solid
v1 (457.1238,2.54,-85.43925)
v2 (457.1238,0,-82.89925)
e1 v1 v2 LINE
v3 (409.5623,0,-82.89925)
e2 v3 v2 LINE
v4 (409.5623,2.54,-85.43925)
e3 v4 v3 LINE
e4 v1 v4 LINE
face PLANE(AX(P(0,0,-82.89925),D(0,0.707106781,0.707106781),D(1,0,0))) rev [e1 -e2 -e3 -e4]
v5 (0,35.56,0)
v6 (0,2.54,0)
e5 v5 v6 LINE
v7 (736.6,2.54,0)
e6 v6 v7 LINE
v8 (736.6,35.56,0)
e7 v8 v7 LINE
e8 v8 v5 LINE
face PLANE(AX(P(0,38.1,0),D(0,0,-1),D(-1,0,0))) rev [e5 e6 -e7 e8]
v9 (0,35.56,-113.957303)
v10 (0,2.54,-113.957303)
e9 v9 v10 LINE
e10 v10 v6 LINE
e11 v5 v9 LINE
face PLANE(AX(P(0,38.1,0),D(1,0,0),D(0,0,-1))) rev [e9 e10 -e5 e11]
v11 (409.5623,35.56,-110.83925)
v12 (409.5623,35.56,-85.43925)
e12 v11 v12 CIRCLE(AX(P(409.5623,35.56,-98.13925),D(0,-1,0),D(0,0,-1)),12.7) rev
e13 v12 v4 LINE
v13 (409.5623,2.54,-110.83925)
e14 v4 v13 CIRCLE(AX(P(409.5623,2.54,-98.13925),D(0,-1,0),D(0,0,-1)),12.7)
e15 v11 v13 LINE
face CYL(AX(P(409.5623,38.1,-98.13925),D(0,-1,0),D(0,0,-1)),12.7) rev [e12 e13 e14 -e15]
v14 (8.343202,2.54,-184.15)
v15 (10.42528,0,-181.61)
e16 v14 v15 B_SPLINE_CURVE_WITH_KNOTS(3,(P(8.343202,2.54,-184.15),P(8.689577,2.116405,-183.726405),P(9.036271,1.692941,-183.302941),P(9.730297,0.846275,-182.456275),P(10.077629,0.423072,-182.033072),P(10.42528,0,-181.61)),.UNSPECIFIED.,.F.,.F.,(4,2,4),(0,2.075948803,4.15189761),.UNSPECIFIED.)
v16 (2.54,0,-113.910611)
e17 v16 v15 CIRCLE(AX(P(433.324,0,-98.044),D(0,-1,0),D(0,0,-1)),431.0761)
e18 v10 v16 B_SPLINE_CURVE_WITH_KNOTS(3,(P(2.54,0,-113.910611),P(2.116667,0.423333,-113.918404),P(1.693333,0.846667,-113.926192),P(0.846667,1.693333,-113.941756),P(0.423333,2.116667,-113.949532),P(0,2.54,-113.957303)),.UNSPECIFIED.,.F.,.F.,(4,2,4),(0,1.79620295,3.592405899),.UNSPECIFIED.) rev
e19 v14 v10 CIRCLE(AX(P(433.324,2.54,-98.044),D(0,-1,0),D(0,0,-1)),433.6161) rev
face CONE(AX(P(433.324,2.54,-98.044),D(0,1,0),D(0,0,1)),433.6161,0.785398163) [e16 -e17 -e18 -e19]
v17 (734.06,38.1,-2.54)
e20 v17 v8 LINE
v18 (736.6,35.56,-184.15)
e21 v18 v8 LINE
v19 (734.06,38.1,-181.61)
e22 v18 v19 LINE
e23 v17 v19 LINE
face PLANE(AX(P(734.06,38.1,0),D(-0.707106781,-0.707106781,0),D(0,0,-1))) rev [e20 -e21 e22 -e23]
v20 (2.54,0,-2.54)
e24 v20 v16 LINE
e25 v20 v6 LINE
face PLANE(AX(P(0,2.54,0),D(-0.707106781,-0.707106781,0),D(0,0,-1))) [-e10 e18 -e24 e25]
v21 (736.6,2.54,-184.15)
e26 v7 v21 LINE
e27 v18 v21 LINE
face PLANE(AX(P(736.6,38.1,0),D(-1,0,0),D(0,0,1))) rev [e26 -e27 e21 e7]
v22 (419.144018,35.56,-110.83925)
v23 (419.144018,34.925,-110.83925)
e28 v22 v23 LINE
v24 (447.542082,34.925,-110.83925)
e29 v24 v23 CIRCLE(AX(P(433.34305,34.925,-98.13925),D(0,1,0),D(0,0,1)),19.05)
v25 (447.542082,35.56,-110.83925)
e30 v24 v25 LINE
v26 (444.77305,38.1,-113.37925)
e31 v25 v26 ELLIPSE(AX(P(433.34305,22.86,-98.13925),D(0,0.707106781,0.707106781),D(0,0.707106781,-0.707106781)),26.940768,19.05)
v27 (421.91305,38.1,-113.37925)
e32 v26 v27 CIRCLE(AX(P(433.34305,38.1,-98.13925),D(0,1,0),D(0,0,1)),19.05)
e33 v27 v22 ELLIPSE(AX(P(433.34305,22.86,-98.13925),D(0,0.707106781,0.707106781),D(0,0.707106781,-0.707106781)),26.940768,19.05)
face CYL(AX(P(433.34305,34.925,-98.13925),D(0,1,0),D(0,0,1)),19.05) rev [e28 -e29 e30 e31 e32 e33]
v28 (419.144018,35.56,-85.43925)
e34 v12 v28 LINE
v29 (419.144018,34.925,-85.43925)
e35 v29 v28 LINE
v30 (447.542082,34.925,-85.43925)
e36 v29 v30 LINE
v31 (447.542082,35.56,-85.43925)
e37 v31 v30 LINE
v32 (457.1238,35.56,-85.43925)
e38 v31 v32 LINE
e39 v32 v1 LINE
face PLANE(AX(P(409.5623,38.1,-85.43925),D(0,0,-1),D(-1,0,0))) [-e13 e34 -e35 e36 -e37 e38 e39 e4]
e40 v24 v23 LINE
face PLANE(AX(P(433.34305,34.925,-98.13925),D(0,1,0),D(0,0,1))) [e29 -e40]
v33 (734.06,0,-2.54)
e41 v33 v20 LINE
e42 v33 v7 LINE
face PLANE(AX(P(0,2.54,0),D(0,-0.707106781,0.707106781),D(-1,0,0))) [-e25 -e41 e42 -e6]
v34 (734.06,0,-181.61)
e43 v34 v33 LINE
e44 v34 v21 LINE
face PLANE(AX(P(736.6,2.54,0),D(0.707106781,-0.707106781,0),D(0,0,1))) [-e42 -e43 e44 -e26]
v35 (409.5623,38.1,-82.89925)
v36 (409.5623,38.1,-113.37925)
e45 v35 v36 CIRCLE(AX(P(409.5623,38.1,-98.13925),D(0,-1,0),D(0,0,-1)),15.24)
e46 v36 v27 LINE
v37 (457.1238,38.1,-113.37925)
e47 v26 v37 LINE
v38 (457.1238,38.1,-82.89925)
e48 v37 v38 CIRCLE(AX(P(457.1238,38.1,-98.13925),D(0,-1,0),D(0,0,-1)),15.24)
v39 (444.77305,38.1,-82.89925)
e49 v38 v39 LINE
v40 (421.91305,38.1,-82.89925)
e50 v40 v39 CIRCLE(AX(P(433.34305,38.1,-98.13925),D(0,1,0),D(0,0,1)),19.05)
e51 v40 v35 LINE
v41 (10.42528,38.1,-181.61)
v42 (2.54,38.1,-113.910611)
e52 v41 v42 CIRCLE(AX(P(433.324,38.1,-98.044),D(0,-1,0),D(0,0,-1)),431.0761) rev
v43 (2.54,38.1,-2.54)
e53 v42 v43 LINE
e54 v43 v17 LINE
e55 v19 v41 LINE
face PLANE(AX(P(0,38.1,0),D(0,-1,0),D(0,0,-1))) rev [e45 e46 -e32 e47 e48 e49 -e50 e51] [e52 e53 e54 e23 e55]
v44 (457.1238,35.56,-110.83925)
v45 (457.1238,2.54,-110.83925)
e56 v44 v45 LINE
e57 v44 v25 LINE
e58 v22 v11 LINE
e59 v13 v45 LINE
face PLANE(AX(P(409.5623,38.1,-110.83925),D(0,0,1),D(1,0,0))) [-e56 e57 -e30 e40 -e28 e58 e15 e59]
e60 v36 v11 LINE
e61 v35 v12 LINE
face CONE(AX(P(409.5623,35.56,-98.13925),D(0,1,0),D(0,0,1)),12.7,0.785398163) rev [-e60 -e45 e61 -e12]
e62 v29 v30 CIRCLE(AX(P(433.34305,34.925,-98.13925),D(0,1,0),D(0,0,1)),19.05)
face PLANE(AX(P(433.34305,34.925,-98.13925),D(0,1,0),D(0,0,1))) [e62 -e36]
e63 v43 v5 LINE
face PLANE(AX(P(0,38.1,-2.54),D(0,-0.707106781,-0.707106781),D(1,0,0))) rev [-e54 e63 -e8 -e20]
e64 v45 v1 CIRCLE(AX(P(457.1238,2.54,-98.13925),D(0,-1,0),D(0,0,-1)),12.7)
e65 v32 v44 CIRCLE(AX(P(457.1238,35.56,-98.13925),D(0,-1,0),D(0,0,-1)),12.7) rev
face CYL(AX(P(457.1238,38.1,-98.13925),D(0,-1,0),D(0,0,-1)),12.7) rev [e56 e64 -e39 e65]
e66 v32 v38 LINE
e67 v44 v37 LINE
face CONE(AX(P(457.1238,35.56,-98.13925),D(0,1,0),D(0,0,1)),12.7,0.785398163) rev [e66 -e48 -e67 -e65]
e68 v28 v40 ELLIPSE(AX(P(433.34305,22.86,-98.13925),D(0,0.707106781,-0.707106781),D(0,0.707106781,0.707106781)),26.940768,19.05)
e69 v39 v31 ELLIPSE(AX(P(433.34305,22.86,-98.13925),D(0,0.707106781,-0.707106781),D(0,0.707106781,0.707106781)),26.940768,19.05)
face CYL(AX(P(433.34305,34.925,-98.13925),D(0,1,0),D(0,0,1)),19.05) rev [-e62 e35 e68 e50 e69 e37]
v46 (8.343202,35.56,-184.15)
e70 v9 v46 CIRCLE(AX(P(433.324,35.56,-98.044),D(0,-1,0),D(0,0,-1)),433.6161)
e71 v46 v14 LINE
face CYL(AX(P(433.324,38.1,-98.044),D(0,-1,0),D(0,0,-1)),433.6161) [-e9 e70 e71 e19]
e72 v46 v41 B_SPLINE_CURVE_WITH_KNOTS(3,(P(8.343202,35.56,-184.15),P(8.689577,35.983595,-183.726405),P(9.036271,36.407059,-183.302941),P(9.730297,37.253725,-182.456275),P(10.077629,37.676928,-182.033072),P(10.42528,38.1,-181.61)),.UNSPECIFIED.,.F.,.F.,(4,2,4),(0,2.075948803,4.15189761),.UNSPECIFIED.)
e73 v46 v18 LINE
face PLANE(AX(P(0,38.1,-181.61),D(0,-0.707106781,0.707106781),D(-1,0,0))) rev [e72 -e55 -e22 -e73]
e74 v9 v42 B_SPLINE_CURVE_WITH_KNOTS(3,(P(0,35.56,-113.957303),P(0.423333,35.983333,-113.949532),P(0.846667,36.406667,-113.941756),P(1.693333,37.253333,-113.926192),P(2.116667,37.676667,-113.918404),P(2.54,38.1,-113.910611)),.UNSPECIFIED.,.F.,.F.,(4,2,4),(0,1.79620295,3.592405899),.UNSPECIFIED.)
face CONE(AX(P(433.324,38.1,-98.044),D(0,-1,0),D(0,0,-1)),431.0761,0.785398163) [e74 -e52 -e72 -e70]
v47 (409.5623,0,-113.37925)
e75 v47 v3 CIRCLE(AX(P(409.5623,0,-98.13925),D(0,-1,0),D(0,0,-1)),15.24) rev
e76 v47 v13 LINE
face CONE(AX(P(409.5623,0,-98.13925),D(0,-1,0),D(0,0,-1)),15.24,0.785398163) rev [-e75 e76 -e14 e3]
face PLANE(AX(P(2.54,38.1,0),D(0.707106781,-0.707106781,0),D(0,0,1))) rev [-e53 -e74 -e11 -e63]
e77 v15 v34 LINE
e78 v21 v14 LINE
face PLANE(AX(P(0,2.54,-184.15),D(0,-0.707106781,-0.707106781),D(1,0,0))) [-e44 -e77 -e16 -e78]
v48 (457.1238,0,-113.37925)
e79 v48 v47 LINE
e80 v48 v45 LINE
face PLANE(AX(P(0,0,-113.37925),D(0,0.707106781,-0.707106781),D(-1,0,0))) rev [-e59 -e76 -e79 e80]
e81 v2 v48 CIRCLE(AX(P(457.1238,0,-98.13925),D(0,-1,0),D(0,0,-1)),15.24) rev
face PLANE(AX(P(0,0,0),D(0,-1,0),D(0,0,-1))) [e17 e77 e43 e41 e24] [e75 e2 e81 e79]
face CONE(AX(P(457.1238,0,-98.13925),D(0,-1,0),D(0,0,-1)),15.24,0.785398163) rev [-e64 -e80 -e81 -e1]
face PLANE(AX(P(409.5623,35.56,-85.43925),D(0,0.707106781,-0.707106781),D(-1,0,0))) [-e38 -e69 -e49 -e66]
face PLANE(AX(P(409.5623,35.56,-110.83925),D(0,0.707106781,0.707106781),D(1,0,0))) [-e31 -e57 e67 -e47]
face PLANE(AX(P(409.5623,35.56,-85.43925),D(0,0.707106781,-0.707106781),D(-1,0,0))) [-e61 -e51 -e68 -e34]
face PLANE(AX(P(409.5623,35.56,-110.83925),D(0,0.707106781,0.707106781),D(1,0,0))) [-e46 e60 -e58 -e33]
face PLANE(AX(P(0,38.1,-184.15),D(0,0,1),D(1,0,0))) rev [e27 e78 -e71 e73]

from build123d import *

# Parameters (mm, degrees)
SKETCH1_W           = 736.6
SKETCH1_H           = 184.15
BOSS_EXTRUDE1_DEPTH = 38.1
CUT_EXTRUDE2_DEPTH  = 761.225224851
CHAMFER1_SIZE       = 2.54
CHAMFER2_SIZE       = 2.54
SKETCH2_R           = 19.05
CUT_EXTRUDE1_DEPTH  = 3.175


with BuildPart() as part:
    # Sketch1 → Boss-Extrude1 (new body)
    with BuildSketch(Plane(origin=(0, 0, 0), x_dir=(1, 0, 0), z_dir=(0, 1, 0))):
        with Locations((368.3, 92.075)):
            Rectangle(SKETCH1_W, SKETCH1_H)
        with BuildLine():
            Line((409.5623, 110.83925), (457.1238, 110.83925))
            ThreePointArc((457.1238, 110.83925), (469.8238, 98.13925), (457.1238, 85.43925))
            Line((457.1238, 85.43925), (409.5623, 85.43925))
            ThreePointArc((409.5623, 85.43925), (396.8623, 98.13925), (409.5623, 110.83925))
        make_face(mode=Mode.SUBTRACT)
    extrude(amount=BOSS_EXTRUDE1_DEPTH)

    # Sketch4 → Cut-Extrude2 (cut, through all)
    with BuildSketch(Plane.XZ):
        with BuildLine():
            Line((0, -184.15), (0, -113.957302712))
            ThreePointArc((0, -113.957302712), (2.738891811, -149.223945145), (8.343201677, -184.15))
            Line((8.343201677, -184.15), (0, -184.15))
        make_face()
    extrude(amount=-CUT_EXTRUDE2_DEPTH, mode=Mode.SUBTRACT)

    # Chamfer1
    # the kernel refuses this chamfer: 2.54 mm, written as the material it takes off along each edge
    with BuildSketch(Plane(origin=(736.6, 38.1, 6.532074789), x_dir=(0.027495876610568244, -0.9996219169112971, 0), z_dir=(0, 0, -1))) as chamfer1_piece_1:
        Polygon((CHAMFER1_SIZE * 0.999621916911, CHAMFER1_SIZE * 0.0274958766106), (-CHAMFER1_SIZE * 0.0274958766106, CHAMFER1_SIZE * 0.999621916911), (0, 0), align=None)
    extrude(amount=197.214149579, mode=Mode.SUBTRACT)
    with BuildSketch(Plane(origin=(457.1238, 38.1, -98.13925), x_dir=(0, 0, -1), z_dir=(-1, 0, 0))) as chamfer1_piece_2:
        Polygon((12.7 + CHAMFER1_SIZE, 0), (12.7, CHAMFER1_SIZE), (12.7, 0), align=None)
    revolve(axis=Axis((457.1238, 38.1, -98.13925), (0, -1, 0)), revolution_arc=180, mode=Mode.SUBTRACT)
    with BuildSketch(Plane(origin=(743.132074789, 38.1, -184.15), x_dir=(0, 0.027495876610587267, 0.9996219169112966), z_dir=(-1, 0, 0))) as chamfer1_piece_3:
        Polygon((CHAMFER1_SIZE * 0.999621916911, -CHAMFER1_SIZE * 0.0274958766106), (-CHAMFER1_SIZE * 0.0274958766106, -CHAMFER1_SIZE * 0.999621916911), (0, 0), align=None)
    extrude(amount=741.320947902, mode=Mode.SUBTRACT)
    with BuildSketch(Plane(origin=(409.5623, 38.1, -110.83925), x_dir=(0, 0.027495876610587267, -0.9996219169112966), z_dir=(1, 0, 0)), Plane(origin=(457.1238, 38.1, -85.43925), x_dir=(0, 0.027495876610587267, 0.9996219169112966), z_dir=(-1, 0, 0))) as chamfer1_piece_4:
        Polygon((CHAMFER1_SIZE * 0.999621916911, -CHAMFER1_SIZE * 0.0274958766106), (-CHAMFER1_SIZE * 0.0274958766106, -CHAMFER1_SIZE * 0.999621916911), (0, 0), align=None)
    extrude(amount=47.5615, mode=Mode.SUBTRACT)
    with BuildSketch(Plane(origin=(409.5623, 38.1, -98.13925), x_dir=(0, 0, 1), z_dir=(1, 0, 0))) as chamfer1_piece_5:
        Polygon((12.7 + CHAMFER1_SIZE, 0), (12.7, CHAMFER1_SIZE), (12.7, 0), align=None)
    revolve(axis=Axis((409.5623, 38.1, -98.13925), (0, -1, 0)), revolution_arc=180, mode=Mode.SUBTRACT)
    with BuildSketch(Plane(origin=(0, 38.1, -120.489377502), x_dir=(-0.02749587661058648, -0.9996219169112968, 0), z_dir=(0, 0, 1))) as chamfer1_piece_6:
        Polygon((CHAMFER1_SIZE * 0.999621916911, CHAMFER1_SIZE * 0.0274958766106), (-CHAMFER1_SIZE * 0.0274958766106, CHAMFER1_SIZE * 0.999621916911), (0, 0), align=None)
    extrude(amount=127.021452291, mode=Mode.SUBTRACT)
    with BuildSketch(Plane(origin=(433.324, 38.1, -98.044), x_dir=(-0.9997657983904642, 0, -0.021641357828885384), z_dir=(-0.021641357828885384, 0, 0.9997657983904642))) as chamfer1_piece_7:
        Polygon((433.6161 - CHAMFER1_SIZE, 0), (433.6161, CHAMFER1_SIZE), (433.6161, 0), align=None)
    revolve(axis=Axis((433.324, 38.1, -98.044), (0, -1, 0)), revolution_arc=11.076796252, mode=Mode.SUBTRACT)
    with BuildSketch(Plane(origin=(-6.532074789, 38.1, 0), x_dir=(0, -0.9996219169112968, 0.027495876610586393), z_dir=(1, 0, 0))) as chamfer1_piece_8:
        Polygon((CHAMFER1_SIZE * 0.999621916911, CHAMFER1_SIZE * 0.0274958766106), (-CHAMFER1_SIZE * 0.0274958766106, CHAMFER1_SIZE * 0.999621916911), (0, 0), align=None)
    extrude(amount=749.664149579, mode=Mode.SUBTRACT)

    # Chamfer2
    # the kernel refuses this chamfer: 2.54 mm, written as the material it takes off along each edge
    with BuildSketch(Plane(origin=(457.1238, 0, -98.13925), x_dir=(0, 0, -1), z_dir=(-1, 0, 0))) as chamfer2_piece_1:
        Polygon((12.7 + CHAMFER2_SIZE, 0), (12.7, -CHAMFER2_SIZE), (12.7, 0), align=None)
    revolve(axis=Axis((457.1238, 0, -98.13925), (0, -1, 0)), revolution_arc=180, mode=Mode.SUBTRACT)
    with BuildSketch(Plane(origin=(409.5623, 0, -110.83925), x_dir=(0, -0.027495876610586324, -0.9996219169112968), z_dir=(1, 0, 0)), Plane(origin=(457.1238, 0, -85.43925), x_dir=(0, -0.027495876610586324, 0.9996219169112968), z_dir=(-1, 0, 0))) as chamfer2_piece_2:
        Polygon((CHAMFER2_SIZE * 0.999621916911, CHAMFER2_SIZE * 0.0274958766106), (-CHAMFER2_SIZE * 0.0274958766106, CHAMFER2_SIZE * 0.999621916911), (0, 0), align=None)
    extrude(amount=47.5615, mode=Mode.SUBTRACT)
    with BuildSketch(Plane(origin=(409.5623, 0, -98.13925), x_dir=(0, 0, 1), z_dir=(1, 0, 0))) as chamfer2_piece_3:
        Polygon((12.7 + CHAMFER2_SIZE, 0), (12.7, -CHAMFER2_SIZE), (12.7, 0), align=None)
    revolve(axis=Axis((409.5623, 0, -98.13925), (0, -1, 0)), revolution_arc=180, mode=Mode.SUBTRACT)
    with BuildSketch(Plane(origin=(0, 0, -120.489377502), x_dir=(0.9996219169112968, -0.02749587661058605, 0), z_dir=(0, 0, 1))) as chamfer2_piece_4:
        Polygon((CHAMFER2_SIZE * 0.999621916911, CHAMFER2_SIZE * 0.0274958766106), (-CHAMFER2_SIZE * 0.0274958766106, CHAMFER2_SIZE * 0.999621916911), (0, 0), align=None)
    extrude(amount=127.021452291, mode=Mode.SUBTRACT)
    with BuildSketch(Plane(origin=(433.324, 0, -98.044), x_dir=(-0.9997657983904642, 0, -0.021641357828885415), z_dir=(-0.021641357828885415, 0, 0.9997657983904642))) as chamfer2_piece_5:
        Polygon((433.6161 - CHAMFER2_SIZE, 0), (433.6161, -CHAMFER2_SIZE), (433.6161, 0), align=None)
    revolve(axis=Axis((433.324, 0, -98.044), (0, -1, 0)), revolution_arc=11.076796252, mode=Mode.SUBTRACT)
    with BuildSketch(Plane(origin=(743.132074789, 0, -184.15), x_dir=(0, -0.027495876610586403, 0.9996219169112968), z_dir=(-1, 0, 0))) as chamfer2_piece_6:
        Polygon((CHAMFER2_SIZE * 0.999621916911, CHAMFER2_SIZE * 0.0274958766106), (-CHAMFER2_SIZE * 0.0274958766106, CHAMFER2_SIZE * 0.999621916911), (0, 0), align=None)
    extrude(amount=741.320947902, mode=Mode.SUBTRACT)
    with BuildSketch(Plane(origin=(736.6, 0, 6.532074789), x_dir=(-0.9996219169112966, -0.027495876610587444, 0), z_dir=(0, 0, -1))) as chamfer2_piece_7:
        Polygon((CHAMFER2_SIZE * 0.999621916911, CHAMFER2_SIZE * 0.0274958766106), (-CHAMFER2_SIZE * 0.0274958766106, CHAMFER2_SIZE * 0.999621916911), (0, 0), align=None)
    extrude(amount=197.214149579, mode=Mode.SUBTRACT)
    with BuildSketch(Plane(origin=(-6.532074789, 0, 0), x_dir=(0, 0.9996219169112968, 0.027495876610586407), z_dir=(1, 0, 0))) as chamfer2_piece_8:
        Polygon((CHAMFER2_SIZE * 0.999621916911, -CHAMFER2_SIZE * 0.0274958766106), (-CHAMFER2_SIZE * 0.0274958766106, -CHAMFER2_SIZE * 0.999621916911), (0, 0), align=None)
    extrude(amount=749.664149579, mode=Mode.SUBTRACT)

    # Sketch2 → Cut-Extrude1 (cut)
    with BuildSketch(Plane(origin=(0, 38.1, 0), x_dir=(1, 0, 0), z_dir=(0, 1, 0))):
        with Locations((433.34305, 98.13925)):
            Circle(SKETCH2_R)
    extrude(amount=-CUT_EXTRUDE1_DEPTH, mode=Mode.SUBTRACT)


solid = part.part
